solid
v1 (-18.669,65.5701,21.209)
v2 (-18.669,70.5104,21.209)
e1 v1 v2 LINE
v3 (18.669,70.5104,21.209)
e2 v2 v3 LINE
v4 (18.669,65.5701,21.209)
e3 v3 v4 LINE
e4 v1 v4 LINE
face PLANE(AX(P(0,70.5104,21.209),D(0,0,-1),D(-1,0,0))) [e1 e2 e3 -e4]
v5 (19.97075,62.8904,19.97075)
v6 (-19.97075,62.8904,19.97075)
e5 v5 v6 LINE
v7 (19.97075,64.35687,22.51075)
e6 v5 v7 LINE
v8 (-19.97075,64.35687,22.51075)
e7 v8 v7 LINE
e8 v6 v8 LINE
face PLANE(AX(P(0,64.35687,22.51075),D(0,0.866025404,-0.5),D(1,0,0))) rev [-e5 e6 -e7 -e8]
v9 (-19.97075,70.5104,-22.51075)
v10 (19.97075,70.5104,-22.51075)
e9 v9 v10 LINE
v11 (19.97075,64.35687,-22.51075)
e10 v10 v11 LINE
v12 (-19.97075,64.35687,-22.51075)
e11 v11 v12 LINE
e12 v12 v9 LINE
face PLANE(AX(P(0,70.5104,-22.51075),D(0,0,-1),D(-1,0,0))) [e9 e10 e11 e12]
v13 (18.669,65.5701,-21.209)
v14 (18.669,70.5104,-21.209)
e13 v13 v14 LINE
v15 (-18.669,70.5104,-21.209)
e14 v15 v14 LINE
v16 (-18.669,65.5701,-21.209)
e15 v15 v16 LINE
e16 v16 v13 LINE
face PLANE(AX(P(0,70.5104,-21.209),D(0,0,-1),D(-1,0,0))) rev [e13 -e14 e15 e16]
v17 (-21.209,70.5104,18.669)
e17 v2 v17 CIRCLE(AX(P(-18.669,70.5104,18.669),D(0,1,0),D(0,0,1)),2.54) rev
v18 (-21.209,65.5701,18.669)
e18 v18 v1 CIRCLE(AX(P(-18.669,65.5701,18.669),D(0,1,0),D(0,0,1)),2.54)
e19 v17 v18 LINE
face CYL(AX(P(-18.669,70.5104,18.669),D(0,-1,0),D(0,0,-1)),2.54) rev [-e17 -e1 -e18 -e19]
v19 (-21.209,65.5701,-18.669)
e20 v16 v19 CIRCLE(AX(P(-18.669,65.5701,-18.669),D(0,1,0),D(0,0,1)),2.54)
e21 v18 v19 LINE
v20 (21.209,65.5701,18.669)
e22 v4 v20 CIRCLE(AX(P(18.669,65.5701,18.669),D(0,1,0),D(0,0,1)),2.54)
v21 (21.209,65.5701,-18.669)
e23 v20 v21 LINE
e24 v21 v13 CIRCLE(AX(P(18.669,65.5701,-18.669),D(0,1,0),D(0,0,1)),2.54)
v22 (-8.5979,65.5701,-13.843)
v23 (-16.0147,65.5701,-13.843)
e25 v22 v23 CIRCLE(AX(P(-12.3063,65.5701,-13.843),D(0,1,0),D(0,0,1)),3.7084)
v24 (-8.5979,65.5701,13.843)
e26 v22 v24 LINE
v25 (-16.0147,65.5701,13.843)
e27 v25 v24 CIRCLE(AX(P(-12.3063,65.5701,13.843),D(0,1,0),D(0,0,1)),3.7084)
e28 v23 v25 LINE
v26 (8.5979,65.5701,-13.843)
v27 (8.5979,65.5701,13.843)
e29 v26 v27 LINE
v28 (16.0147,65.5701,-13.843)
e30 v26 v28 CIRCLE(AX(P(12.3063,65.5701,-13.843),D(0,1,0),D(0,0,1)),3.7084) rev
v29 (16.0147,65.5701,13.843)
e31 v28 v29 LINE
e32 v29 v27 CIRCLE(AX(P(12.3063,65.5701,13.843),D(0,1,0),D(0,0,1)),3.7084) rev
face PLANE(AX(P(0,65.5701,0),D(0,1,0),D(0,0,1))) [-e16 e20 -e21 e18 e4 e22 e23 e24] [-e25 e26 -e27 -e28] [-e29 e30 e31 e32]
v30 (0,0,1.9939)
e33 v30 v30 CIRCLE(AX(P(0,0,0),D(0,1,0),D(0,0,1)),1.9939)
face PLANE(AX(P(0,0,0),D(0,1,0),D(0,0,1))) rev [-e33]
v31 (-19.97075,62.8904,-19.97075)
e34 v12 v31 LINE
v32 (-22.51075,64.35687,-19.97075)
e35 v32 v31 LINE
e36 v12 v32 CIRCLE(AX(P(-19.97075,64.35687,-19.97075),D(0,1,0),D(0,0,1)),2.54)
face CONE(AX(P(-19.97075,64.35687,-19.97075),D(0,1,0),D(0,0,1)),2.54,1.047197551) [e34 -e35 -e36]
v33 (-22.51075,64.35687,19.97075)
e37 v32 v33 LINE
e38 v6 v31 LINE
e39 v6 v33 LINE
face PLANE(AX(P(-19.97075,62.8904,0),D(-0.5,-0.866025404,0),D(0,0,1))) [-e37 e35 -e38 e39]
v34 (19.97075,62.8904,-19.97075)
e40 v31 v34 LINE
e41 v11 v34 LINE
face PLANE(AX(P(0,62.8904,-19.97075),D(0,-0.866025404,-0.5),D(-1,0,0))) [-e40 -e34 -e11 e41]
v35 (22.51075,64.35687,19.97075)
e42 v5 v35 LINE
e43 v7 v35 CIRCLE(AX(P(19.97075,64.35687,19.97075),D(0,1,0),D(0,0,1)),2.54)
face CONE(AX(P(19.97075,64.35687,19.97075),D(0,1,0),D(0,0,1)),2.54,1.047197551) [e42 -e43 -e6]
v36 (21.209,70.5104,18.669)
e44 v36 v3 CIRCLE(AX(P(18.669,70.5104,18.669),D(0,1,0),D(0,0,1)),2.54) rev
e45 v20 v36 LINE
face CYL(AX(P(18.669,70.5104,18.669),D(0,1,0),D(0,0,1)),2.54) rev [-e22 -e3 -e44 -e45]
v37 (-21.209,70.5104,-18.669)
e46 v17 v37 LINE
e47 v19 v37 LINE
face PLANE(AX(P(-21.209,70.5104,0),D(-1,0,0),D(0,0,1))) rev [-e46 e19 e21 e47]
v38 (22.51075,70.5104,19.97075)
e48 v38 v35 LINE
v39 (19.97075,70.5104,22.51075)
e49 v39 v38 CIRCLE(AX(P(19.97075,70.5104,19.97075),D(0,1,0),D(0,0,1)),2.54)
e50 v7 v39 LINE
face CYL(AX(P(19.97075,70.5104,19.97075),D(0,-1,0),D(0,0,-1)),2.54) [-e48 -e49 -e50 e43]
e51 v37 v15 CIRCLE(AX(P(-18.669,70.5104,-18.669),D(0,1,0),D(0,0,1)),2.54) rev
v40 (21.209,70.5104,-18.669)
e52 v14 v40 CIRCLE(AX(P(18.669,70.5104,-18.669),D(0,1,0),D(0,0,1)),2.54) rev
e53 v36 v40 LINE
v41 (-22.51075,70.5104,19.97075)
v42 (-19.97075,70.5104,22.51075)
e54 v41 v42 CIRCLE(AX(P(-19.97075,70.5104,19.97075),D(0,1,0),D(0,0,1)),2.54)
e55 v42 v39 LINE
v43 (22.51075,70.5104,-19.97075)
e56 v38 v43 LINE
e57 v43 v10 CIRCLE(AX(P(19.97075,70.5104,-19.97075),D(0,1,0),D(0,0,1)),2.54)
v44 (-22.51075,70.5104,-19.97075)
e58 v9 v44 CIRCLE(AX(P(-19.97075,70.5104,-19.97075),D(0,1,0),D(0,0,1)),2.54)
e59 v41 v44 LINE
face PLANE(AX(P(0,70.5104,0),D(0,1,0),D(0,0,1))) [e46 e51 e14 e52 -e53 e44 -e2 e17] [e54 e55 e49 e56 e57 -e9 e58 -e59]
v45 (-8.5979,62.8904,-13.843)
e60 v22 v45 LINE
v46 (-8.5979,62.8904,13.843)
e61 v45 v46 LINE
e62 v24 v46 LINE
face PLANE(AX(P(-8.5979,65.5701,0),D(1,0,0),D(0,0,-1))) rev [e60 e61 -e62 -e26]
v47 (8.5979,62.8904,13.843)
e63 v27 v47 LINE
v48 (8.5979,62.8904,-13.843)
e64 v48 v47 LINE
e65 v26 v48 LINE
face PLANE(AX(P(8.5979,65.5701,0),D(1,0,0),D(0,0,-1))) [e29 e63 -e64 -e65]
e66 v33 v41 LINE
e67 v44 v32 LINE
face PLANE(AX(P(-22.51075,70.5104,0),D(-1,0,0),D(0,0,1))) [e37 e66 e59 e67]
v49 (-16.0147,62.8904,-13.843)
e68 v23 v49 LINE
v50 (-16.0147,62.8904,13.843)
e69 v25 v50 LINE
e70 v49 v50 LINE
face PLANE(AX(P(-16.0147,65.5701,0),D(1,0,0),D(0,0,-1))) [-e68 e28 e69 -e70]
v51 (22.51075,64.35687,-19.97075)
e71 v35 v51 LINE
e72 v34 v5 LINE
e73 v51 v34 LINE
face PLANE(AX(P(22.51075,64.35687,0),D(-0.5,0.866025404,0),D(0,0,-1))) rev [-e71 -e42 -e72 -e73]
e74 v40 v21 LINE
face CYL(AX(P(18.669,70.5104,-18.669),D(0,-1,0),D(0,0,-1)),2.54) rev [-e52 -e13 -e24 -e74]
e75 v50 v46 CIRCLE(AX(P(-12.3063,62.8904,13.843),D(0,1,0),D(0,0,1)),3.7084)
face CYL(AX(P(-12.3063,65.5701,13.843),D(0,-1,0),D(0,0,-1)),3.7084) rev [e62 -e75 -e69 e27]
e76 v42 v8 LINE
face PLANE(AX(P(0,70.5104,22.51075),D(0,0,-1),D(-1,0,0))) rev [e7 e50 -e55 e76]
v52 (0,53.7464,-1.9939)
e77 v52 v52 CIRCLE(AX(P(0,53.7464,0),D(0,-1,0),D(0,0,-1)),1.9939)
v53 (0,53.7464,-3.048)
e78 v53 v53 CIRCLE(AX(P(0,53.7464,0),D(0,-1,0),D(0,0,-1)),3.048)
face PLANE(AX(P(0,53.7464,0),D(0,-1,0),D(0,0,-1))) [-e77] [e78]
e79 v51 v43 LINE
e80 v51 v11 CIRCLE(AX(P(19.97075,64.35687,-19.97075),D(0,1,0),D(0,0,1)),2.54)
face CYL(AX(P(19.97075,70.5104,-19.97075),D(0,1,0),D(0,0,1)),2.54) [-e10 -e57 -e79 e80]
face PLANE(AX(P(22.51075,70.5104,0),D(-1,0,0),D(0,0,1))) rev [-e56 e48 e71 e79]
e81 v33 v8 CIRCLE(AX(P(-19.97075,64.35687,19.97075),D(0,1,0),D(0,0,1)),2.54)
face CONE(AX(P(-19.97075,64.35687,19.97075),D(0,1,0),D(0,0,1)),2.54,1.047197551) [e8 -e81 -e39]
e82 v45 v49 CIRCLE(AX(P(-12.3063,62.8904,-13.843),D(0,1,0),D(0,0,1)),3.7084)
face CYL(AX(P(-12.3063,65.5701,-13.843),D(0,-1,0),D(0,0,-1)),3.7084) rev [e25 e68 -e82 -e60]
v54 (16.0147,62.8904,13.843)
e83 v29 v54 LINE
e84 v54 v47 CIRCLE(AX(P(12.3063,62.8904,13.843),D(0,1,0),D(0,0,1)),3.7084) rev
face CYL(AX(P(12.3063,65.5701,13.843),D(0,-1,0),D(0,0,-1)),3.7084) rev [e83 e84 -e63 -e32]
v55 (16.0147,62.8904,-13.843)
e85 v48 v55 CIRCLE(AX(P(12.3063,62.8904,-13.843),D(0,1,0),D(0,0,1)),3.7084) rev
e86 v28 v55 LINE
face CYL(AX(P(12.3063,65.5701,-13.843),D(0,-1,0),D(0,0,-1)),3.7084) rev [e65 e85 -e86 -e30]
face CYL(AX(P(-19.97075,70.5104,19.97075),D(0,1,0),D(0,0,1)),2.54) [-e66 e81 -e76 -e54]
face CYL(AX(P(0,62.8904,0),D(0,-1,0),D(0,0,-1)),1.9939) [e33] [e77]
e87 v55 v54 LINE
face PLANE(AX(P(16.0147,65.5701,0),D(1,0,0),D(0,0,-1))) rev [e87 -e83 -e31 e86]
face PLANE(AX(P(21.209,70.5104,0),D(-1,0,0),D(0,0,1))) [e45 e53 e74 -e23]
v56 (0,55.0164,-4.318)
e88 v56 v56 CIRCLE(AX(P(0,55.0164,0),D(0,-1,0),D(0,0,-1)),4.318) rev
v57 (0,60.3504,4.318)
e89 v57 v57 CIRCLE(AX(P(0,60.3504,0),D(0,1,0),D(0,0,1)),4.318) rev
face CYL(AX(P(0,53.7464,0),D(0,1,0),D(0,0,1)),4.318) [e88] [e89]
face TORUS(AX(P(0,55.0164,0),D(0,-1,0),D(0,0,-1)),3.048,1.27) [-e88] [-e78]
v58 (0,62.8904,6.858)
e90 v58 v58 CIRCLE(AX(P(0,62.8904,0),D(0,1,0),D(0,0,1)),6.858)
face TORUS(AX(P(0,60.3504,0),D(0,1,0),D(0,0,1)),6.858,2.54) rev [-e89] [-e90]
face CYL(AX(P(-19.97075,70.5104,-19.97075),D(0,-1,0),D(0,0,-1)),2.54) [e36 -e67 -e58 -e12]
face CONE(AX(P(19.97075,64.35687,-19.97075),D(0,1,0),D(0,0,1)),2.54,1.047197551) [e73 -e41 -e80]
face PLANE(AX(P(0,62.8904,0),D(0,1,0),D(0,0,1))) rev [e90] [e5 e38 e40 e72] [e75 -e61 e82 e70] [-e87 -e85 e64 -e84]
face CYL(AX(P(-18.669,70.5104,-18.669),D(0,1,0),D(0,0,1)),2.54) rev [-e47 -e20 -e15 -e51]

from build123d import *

# Parameters (mm, degrees)
SKETCH1_R           = 1.9939
BOSS_EXTRUDE1_DEPTH = 62.8904
SKETCH2_W           = 42.418
SKETCH2_H           = 42.418
SKETCH2_R           = 1.9939
BOSS_EXTRUDE2_DEPTH = 2.6797
SKETCH2_3_W         = 45.0215
SKETCH2_3_H         = 45.0215
SKETCH2_3_W_2       = 42.418
SKETCH2_3_H_2       = 42.418
BOSS_EXTRUDE3_DEPTH = 7.62
FILLET1_R           = 2.54
SKETCH3_R           = 4.318
BOSS_EXTRUDE4_DEPTH = 9.144
FILLET2_R           = 2.54
FILLET3_R           = 1.27
CHAMFER1_SIZE       = 2.54
CHAMFER1_SIZE_2     = 1.466469684


with BuildPart() as part:
    # Sketch1 → Boss-Extrude1 (new body)
    with BuildSketch(Plane(origin=(0, 0, 0), x_dir=(1, 0, 0), z_dir=(0, 1, 0))):
        with Locations(Location((0, 0, 0), (0, 0, 270))):
            Circle(SKETCH1_R)
    extrude(amount=BOSS_EXTRUDE1_DEPTH)



with BuildPart() as body_2:
    # Sketch2 → Boss-Extrude2 (new body)
    # profile 1 of 2: a face of its own
    with BuildSketch(Plane(origin=(0, 62.8904, 0), x_dir=(1, 0, 0), z_dir=(0, 1, 0))):
        Rectangle(SKETCH2_W, SKETCH2_H)
        with Locations(Location((0, 0, 0), (0, 0, 270))):
            Circle(SKETCH2_R, mode=Mode.SUBTRACT)
        with BuildLine():
            ThreePointArc((-16.0147, -13.843), (-12.3063, -17.5514), (-8.5979, -13.843))
            Line((-8.5979, -13.843), (-8.5979, 13.843))
            ThreePointArc((-8.5979, 13.843), (-12.3063, 17.5514), (-16.0147, 13.843))
            Line((-16.0147, 13.843), (-16.0147, -13.843))
        make_face(mode=Mode.SUBTRACT)
        with BuildLine():
            Line((16.0147, 13.843), (16.0147, -13.843))
            ThreePointArc((16.0147, -13.843), (12.3063, -17.5514), (8.5979, -13.843))
            Line((8.5979, -13.843), (8.5979, 13.843))
            ThreePointArc((8.5979, 13.843), (12.3063, 17.5514), (16.0147, 13.843))
        make_face(mode=Mode.SUBTRACT)
    # profile 2 of 2: a face of its own
    with BuildSketch(Plane(origin=(0, 62.8904, 0), x_dir=(1, 0, 0), z_dir=(0, 1, 0))):
        with Locations(Location((0, 0, 0), (0, 0, 270))):
            Circle(SKETCH2_R)
    extrude(amount=BOSS_EXTRUDE2_DEPTH)


with BuildPart() as part_1:
    add(part.part)

    add(body_2.part)  # Boss-Extrude3 merges body 2
    # Sketch2<3> → Boss-Extrude3 (add)
    with BuildSketch(Plane(origin=(0, 62.8904, 0), x_dir=(1, 0, 0), z_dir=(0, 1, 0))):
        Rectangle(SKETCH2_3_W, SKETCH2_3_H)
        Rectangle(SKETCH2_3_W_2, SKETCH2_3_H_2, mode=Mode.SUBTRACT)
    extrude(amount=BOSS_EXTRUDE3_DEPTH)

    # Fillet1
    fillet1_edges = [part_1.edges().sort_by_distance(p)[0] for p in [
        (21.209, 68.04025, 21.209),
        (-21.209, 68.04025, 21.209),
        (-21.209, 68.04025, -21.209),
        (-22.51075, 66.7004, 22.51075),
        (22.51075, 66.7004, 22.51075),
        (22.51075, 66.7004, -22.51075),
        (-22.51075, 66.7004, -22.51075),
        (21.209, 68.04025, -21.209),
    ]]
    fillet(fillet1_edges, radius=FILLET1_R)

    # Sketch3 → Boss-Extrude4 (add)
    with BuildSketch(Plane.XZ.offset(-62.8904)):
        with Locations(Location((0, 0, 0), (0, 0, 90))):
            Circle(SKETCH3_R)
    extrude(amount=BOSS_EXTRUDE4_DEPTH)

    # Fillet2
    fillet2_edges = [part_1.edges().sort_by_distance(p)[0] for p in [
        (0, 62.8904, -4.318),
    ]]
    fillet(fillet2_edges, radius=FILLET2_R)

    # Fillet3
    fillet3_edges = [part_1.edges().sort_by_distance(p)[0] for p in [
        (0, 53.7464, -4.318),
    ]]
    fillet(fillet3_edges, radius=FILLET3_R)

    # Chamfer1
    # the kernel refuses this chamfer: 2.54, 1.466469684 mm, written as the material it takes off along each edge
    with BuildSketch(Plane(origin=(-19.97075, 62.8904, 22.51075), x_dir=(0, 0, -1), z_dir=(1, 0, 0)), Plane(origin=(-22.51075, 62.8904, -19.97075), x_dir=(1, 0, 0), z_dir=(0, 0, 1)), Plane(origin=(19.97075, 62.8904, -22.51075), x_dir=(0, 0, 1), z_dir=(-1, 0, 0)), Plane(origin=(22.51075, 62.8904, 19.97075), x_dir=(-1, 0, 0), z_dir=(0, 0, -1))) as chamfer1_piece_1:
        Polygon((CHAMFER1_SIZE, 0), (0, CHAMFER1_SIZE_2), (0, 0), align=None)
    extrude(amount=39.9415, mode=Mode.SUBTRACT)
    with BuildSketch(Plane(origin=(-19.97075, 62.8904, -19.97075), x_dir=(0, 0, -1), z_dir=(1, 0, 0))) as chamfer1_piece_2:
        Polygon((2.54 - CHAMFER1_SIZE, 0), (2.54, CHAMFER1_SIZE_2), (2.54, 0), align=None)
    revolve(axis=Axis((-19.97075, 62.8904, -19.97075), (0, 1, 0)), revolution_arc=90, mode=Mode.SUBTRACT)
    with BuildSketch(Plane(origin=(19.97075, 62.8904, 19.97075), x_dir=(0, 0, 1), z_dir=(-1, 0, 0))) as chamfer1_piece_3:
        Polygon((2.54 - CHAMFER1_SIZE, 0), (2.54, CHAMFER1_SIZE_2), (2.54, 0), align=None)
    revolve(axis=Axis((19.97075, 62.8904, 19.97075), (0, 1, 0)), revolution_arc=90, mode=Mode.SUBTRACT)
    with BuildSketch(Plane(origin=(19.97075, 62.8904, -19.97075), x_dir=(1, 0, 0), z_dir=(0, 0, 1))) as chamfer1_piece_4:
        Polygon((2.54 - CHAMFER1_SIZE, 0), (2.54, CHAMFER1_SIZE_2), (2.54, 0), align=None)
    revolve(axis=Axis((19.97075, 62.8904, -19.97075), (0, 1, 0)), revolution_arc=90, mode=Mode.SUBTRACT)
    with BuildSketch(Plane(origin=(-19.97075, 62.8904, 19.97075), x_dir=(0, 0, 1), z_dir=(1, 0, 0))) as chamfer1_piece_5:
        Polygon((2.54 - CHAMFER1_SIZE, 0), (2.54, -CHAMFER1_SIZE_2), (2.54, 0), align=None)
    revolve(axis=Axis((-19.97075, 62.8904, 19.97075), (0, -1, 0)), revolution_arc=90, mode=Mode.SUBTRACT)


solid = part_1.part
